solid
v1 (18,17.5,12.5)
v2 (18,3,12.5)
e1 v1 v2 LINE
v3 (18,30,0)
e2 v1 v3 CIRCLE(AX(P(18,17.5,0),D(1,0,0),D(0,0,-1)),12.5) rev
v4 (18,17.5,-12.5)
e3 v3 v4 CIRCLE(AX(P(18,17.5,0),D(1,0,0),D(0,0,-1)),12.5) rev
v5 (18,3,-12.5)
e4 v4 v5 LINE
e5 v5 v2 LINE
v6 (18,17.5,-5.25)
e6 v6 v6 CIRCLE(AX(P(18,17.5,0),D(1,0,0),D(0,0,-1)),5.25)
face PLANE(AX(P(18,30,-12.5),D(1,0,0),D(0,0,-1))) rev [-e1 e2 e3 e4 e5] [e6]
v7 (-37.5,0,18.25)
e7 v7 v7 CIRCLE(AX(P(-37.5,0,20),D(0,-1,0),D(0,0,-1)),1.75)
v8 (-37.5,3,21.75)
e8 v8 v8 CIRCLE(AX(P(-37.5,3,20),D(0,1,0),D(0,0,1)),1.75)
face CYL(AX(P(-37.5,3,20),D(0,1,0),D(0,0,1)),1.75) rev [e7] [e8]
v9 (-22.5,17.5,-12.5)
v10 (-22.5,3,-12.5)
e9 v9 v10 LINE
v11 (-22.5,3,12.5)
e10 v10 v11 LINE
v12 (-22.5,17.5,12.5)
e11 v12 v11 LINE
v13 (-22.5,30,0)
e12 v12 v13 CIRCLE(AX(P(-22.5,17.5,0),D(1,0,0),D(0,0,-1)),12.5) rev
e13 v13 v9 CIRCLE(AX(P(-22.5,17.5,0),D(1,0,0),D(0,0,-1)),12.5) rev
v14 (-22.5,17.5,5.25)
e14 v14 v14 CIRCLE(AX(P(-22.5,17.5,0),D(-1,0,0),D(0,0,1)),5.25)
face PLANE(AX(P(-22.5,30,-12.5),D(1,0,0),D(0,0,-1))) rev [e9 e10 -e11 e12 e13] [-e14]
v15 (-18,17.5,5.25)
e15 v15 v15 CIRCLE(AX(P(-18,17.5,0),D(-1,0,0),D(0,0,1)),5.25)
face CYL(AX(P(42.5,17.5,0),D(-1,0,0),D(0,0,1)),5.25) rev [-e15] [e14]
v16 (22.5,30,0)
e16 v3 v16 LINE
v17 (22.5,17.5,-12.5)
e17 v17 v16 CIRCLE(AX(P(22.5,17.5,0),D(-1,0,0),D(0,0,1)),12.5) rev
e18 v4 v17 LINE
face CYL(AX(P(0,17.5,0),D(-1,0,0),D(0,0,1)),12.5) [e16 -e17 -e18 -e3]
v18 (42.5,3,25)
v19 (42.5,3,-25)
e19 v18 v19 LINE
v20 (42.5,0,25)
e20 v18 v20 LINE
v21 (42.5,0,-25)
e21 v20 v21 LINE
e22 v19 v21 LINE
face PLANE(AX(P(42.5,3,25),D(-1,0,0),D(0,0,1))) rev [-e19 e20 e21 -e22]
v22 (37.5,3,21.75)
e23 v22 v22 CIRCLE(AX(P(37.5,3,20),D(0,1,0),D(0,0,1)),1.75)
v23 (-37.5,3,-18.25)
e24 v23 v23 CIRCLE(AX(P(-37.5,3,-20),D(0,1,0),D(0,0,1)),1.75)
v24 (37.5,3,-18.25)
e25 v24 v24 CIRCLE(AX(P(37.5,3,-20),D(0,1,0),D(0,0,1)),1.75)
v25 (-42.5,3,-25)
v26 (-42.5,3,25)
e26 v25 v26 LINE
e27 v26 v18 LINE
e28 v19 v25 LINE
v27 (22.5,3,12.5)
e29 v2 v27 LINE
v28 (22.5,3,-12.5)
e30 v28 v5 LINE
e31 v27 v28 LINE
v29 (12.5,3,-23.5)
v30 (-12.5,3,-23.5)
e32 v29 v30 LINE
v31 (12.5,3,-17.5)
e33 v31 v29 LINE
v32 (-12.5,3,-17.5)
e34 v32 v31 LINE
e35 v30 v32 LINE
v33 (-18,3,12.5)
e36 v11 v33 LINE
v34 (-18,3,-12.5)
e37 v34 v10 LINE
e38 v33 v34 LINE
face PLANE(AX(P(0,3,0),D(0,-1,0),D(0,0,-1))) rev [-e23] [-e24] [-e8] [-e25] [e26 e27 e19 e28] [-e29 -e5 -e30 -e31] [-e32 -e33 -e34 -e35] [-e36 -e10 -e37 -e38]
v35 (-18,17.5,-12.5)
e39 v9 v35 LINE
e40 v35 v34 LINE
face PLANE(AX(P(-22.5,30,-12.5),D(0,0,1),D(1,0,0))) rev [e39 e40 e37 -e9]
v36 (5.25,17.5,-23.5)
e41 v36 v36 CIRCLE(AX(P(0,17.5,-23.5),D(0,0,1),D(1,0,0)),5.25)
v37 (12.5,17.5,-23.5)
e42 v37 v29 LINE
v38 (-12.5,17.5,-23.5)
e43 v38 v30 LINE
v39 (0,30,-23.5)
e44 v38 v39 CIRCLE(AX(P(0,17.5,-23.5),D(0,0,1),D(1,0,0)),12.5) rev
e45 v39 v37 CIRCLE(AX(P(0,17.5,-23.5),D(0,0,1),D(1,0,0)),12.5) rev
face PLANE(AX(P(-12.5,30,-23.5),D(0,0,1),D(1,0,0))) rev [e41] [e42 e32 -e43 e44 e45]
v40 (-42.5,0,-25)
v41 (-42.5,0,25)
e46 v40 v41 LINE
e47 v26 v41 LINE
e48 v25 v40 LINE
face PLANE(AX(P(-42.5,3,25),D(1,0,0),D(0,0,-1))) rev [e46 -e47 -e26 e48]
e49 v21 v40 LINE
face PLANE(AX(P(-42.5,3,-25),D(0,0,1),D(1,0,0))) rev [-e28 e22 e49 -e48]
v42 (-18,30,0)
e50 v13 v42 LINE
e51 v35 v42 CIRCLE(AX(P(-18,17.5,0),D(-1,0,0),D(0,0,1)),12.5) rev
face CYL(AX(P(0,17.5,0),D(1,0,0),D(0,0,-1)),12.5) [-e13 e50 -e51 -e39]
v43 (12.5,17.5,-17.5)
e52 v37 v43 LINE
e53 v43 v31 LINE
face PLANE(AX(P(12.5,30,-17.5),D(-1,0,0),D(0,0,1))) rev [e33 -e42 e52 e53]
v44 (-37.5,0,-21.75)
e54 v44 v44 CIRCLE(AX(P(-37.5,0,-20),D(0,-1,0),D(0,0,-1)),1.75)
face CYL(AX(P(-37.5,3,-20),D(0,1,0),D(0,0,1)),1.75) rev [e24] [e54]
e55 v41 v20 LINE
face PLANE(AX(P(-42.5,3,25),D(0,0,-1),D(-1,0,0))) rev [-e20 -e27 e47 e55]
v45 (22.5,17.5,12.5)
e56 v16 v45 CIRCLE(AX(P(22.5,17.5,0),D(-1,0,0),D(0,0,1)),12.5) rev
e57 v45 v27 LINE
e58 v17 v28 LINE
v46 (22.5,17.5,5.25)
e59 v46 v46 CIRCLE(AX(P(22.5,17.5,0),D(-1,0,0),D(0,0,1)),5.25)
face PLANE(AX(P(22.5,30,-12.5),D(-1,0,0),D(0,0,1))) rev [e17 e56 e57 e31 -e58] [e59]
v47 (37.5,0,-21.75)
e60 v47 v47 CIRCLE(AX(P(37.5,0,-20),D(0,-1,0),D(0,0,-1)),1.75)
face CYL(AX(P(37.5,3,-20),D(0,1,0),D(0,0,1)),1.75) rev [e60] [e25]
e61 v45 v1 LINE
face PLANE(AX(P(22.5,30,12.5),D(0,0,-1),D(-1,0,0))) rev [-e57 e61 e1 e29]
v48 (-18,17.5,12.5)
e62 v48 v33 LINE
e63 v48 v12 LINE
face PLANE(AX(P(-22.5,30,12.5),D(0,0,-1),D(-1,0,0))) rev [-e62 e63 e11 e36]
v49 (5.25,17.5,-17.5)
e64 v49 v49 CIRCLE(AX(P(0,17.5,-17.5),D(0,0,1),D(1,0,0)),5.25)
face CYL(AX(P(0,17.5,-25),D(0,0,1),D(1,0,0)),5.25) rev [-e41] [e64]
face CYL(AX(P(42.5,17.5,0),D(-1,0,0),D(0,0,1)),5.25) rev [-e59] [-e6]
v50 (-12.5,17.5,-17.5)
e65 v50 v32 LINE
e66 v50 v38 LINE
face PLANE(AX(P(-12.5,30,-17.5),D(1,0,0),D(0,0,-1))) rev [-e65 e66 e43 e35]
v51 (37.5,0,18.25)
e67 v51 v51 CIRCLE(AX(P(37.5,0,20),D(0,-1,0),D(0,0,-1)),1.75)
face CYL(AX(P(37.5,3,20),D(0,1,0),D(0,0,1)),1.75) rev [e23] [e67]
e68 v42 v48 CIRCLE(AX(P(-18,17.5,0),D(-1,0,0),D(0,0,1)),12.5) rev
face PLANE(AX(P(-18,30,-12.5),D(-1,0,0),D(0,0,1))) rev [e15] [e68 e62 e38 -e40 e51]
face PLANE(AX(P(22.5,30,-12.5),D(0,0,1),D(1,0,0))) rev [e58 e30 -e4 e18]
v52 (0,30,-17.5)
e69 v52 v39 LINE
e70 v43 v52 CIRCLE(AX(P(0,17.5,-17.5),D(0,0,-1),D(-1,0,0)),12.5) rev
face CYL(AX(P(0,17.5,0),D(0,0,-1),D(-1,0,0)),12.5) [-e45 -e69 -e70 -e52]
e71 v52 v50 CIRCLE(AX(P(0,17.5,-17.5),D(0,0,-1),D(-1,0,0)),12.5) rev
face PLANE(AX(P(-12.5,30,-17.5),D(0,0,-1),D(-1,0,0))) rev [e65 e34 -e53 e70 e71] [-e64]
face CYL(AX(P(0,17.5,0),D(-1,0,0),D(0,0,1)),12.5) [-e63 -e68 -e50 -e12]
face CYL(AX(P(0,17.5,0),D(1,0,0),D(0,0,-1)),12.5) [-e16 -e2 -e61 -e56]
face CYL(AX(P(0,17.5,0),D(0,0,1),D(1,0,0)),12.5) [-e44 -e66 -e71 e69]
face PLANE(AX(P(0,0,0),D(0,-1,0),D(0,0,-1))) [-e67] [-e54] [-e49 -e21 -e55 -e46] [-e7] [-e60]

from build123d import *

# Parameters (mm, degrees)
SKICA1_W                          = 85
SKICA1_H                          = 50
P_IDAT_VYSUNUT_M1_DEPTH           = 3
SKICA2_W                          = 4.5
SKICA2_H                          = 25
SKICA2_W_2                        = 25
SKICA2_H_2                        = 6
P_IDAT_VYSUNUT_M2_DEPTH           = 27
ZAOBLIT1_R                        = 12.5
SKICA3_R                          = 5.25
ODEBRAT_VYSUNUT_M1_DEPTH          = 76.828754441
SKICA4_R                          = 5.25
ODEBRAT_VYSUNUT_M2_DEPTH          = 68.175144213
D_RY_PRO_KOL_K_VELIKOST_MM1_D     = 3.5
D_RY_PRO_KOL_K_VELIKOST_MM1_DEPTH = 10
D_RY_PRO_KOL_K_VELIKOST_MM1_TIP   = 1.051506083


with BuildPart() as part:
    # Skica1 → Přidat vysunutím1 (new body)
    with BuildSketch(Plane(origin=(0, 0, 0), x_dir=(1, 0, 0), z_dir=(0, 1, 0))):
        Rectangle(SKICA1_W, SKICA1_H)
    extrude(amount=P_IDAT_VYSUNUT_M1_DEPTH)

    # Skica2 → Přidat vysunutím2 (add)
    with BuildSketch(Plane(origin=(0, 3, 0), x_dir=(1, 0, 0), z_dir=(0, 1, 0))):
        with Locations((-20.25, 0)):
            Rectangle(SKICA2_W, SKICA2_H)
        with Locations((0, 20.5)):
            Rectangle(SKICA2_W_2, SKICA2_H_2)
        with Locations((20.25, 0)):
            Rectangle(SKICA2_W, SKICA2_H)
    extrude(amount=P_IDAT_VYSUNUT_M2_DEPTH)

    # Zaoblit1
    zaoblit1_edges = [part.edges().sort_by_distance(p)[0] for p in [
        (-20.25, 30, -12.5),
        (-20.25, 30, 12.5),
        (-12.5, 30, -20.5),
        (12.5, 30, -20.5),
        (20.25, 30, -12.5),
        (20.25, 30, 12.5),
    ]]
    fillet(zaoblit1_edges, radius=ZAOBLIT1_R - 0.0001)  # a hair under: the kernel refuses the full size

    # Skica3 → Odebrat vysunutím1 (cut, through all)
    with BuildSketch(Plane.ZY.offset(22.5)):
        with Locations((0, 17.5)):
            Circle(SKICA3_R)
    extrude(amount=-ODEBRAT_VYSUNUT_M1_DEPTH, mode=Mode.SUBTRACT)

    # Skica4 → Odebrat vysunutím2 (cut, through all)
    with BuildSketch(Plane.XY.offset(-17.5)):
        with Locations((0, 17.5)):
            Circle(SKICA4_R)
    extrude(amount=-ODEBRAT_VYSUNUT_M2_DEPTH, mode=Mode.SUBTRACT)

    # Díry pro kolík, velikost mm1
    with Locations(Plane(origin=(0, 3, 0), x_dir=(1, 0, 0), z_dir=(0, 1, 0))):
        with Locations((-37.5, 20), (37.5, 20), (37.5, -20), (-37.5, -20)):
            Hole(D_RY_PRO_KOL_K_VELIKOST_MM1_D / 2, depth=D_RY_PRO_KOL_K_VELIKOST_MM1_DEPTH)
            with Locations((0, 0, -(D_RY_PRO_KOL_K_VELIKOST_MM1_DEPTH + D_RY_PRO_KOL_K_VELIKOST_MM1_TIP / 2))):  # 118° drill point
                Cone(0, D_RY_PRO_KOL_K_VELIKOST_MM1_D / 2, D_RY_PRO_KOL_K_VELIKOST_MM1_TIP, mode=Mode.SUBTRACT)


solid = part.part
